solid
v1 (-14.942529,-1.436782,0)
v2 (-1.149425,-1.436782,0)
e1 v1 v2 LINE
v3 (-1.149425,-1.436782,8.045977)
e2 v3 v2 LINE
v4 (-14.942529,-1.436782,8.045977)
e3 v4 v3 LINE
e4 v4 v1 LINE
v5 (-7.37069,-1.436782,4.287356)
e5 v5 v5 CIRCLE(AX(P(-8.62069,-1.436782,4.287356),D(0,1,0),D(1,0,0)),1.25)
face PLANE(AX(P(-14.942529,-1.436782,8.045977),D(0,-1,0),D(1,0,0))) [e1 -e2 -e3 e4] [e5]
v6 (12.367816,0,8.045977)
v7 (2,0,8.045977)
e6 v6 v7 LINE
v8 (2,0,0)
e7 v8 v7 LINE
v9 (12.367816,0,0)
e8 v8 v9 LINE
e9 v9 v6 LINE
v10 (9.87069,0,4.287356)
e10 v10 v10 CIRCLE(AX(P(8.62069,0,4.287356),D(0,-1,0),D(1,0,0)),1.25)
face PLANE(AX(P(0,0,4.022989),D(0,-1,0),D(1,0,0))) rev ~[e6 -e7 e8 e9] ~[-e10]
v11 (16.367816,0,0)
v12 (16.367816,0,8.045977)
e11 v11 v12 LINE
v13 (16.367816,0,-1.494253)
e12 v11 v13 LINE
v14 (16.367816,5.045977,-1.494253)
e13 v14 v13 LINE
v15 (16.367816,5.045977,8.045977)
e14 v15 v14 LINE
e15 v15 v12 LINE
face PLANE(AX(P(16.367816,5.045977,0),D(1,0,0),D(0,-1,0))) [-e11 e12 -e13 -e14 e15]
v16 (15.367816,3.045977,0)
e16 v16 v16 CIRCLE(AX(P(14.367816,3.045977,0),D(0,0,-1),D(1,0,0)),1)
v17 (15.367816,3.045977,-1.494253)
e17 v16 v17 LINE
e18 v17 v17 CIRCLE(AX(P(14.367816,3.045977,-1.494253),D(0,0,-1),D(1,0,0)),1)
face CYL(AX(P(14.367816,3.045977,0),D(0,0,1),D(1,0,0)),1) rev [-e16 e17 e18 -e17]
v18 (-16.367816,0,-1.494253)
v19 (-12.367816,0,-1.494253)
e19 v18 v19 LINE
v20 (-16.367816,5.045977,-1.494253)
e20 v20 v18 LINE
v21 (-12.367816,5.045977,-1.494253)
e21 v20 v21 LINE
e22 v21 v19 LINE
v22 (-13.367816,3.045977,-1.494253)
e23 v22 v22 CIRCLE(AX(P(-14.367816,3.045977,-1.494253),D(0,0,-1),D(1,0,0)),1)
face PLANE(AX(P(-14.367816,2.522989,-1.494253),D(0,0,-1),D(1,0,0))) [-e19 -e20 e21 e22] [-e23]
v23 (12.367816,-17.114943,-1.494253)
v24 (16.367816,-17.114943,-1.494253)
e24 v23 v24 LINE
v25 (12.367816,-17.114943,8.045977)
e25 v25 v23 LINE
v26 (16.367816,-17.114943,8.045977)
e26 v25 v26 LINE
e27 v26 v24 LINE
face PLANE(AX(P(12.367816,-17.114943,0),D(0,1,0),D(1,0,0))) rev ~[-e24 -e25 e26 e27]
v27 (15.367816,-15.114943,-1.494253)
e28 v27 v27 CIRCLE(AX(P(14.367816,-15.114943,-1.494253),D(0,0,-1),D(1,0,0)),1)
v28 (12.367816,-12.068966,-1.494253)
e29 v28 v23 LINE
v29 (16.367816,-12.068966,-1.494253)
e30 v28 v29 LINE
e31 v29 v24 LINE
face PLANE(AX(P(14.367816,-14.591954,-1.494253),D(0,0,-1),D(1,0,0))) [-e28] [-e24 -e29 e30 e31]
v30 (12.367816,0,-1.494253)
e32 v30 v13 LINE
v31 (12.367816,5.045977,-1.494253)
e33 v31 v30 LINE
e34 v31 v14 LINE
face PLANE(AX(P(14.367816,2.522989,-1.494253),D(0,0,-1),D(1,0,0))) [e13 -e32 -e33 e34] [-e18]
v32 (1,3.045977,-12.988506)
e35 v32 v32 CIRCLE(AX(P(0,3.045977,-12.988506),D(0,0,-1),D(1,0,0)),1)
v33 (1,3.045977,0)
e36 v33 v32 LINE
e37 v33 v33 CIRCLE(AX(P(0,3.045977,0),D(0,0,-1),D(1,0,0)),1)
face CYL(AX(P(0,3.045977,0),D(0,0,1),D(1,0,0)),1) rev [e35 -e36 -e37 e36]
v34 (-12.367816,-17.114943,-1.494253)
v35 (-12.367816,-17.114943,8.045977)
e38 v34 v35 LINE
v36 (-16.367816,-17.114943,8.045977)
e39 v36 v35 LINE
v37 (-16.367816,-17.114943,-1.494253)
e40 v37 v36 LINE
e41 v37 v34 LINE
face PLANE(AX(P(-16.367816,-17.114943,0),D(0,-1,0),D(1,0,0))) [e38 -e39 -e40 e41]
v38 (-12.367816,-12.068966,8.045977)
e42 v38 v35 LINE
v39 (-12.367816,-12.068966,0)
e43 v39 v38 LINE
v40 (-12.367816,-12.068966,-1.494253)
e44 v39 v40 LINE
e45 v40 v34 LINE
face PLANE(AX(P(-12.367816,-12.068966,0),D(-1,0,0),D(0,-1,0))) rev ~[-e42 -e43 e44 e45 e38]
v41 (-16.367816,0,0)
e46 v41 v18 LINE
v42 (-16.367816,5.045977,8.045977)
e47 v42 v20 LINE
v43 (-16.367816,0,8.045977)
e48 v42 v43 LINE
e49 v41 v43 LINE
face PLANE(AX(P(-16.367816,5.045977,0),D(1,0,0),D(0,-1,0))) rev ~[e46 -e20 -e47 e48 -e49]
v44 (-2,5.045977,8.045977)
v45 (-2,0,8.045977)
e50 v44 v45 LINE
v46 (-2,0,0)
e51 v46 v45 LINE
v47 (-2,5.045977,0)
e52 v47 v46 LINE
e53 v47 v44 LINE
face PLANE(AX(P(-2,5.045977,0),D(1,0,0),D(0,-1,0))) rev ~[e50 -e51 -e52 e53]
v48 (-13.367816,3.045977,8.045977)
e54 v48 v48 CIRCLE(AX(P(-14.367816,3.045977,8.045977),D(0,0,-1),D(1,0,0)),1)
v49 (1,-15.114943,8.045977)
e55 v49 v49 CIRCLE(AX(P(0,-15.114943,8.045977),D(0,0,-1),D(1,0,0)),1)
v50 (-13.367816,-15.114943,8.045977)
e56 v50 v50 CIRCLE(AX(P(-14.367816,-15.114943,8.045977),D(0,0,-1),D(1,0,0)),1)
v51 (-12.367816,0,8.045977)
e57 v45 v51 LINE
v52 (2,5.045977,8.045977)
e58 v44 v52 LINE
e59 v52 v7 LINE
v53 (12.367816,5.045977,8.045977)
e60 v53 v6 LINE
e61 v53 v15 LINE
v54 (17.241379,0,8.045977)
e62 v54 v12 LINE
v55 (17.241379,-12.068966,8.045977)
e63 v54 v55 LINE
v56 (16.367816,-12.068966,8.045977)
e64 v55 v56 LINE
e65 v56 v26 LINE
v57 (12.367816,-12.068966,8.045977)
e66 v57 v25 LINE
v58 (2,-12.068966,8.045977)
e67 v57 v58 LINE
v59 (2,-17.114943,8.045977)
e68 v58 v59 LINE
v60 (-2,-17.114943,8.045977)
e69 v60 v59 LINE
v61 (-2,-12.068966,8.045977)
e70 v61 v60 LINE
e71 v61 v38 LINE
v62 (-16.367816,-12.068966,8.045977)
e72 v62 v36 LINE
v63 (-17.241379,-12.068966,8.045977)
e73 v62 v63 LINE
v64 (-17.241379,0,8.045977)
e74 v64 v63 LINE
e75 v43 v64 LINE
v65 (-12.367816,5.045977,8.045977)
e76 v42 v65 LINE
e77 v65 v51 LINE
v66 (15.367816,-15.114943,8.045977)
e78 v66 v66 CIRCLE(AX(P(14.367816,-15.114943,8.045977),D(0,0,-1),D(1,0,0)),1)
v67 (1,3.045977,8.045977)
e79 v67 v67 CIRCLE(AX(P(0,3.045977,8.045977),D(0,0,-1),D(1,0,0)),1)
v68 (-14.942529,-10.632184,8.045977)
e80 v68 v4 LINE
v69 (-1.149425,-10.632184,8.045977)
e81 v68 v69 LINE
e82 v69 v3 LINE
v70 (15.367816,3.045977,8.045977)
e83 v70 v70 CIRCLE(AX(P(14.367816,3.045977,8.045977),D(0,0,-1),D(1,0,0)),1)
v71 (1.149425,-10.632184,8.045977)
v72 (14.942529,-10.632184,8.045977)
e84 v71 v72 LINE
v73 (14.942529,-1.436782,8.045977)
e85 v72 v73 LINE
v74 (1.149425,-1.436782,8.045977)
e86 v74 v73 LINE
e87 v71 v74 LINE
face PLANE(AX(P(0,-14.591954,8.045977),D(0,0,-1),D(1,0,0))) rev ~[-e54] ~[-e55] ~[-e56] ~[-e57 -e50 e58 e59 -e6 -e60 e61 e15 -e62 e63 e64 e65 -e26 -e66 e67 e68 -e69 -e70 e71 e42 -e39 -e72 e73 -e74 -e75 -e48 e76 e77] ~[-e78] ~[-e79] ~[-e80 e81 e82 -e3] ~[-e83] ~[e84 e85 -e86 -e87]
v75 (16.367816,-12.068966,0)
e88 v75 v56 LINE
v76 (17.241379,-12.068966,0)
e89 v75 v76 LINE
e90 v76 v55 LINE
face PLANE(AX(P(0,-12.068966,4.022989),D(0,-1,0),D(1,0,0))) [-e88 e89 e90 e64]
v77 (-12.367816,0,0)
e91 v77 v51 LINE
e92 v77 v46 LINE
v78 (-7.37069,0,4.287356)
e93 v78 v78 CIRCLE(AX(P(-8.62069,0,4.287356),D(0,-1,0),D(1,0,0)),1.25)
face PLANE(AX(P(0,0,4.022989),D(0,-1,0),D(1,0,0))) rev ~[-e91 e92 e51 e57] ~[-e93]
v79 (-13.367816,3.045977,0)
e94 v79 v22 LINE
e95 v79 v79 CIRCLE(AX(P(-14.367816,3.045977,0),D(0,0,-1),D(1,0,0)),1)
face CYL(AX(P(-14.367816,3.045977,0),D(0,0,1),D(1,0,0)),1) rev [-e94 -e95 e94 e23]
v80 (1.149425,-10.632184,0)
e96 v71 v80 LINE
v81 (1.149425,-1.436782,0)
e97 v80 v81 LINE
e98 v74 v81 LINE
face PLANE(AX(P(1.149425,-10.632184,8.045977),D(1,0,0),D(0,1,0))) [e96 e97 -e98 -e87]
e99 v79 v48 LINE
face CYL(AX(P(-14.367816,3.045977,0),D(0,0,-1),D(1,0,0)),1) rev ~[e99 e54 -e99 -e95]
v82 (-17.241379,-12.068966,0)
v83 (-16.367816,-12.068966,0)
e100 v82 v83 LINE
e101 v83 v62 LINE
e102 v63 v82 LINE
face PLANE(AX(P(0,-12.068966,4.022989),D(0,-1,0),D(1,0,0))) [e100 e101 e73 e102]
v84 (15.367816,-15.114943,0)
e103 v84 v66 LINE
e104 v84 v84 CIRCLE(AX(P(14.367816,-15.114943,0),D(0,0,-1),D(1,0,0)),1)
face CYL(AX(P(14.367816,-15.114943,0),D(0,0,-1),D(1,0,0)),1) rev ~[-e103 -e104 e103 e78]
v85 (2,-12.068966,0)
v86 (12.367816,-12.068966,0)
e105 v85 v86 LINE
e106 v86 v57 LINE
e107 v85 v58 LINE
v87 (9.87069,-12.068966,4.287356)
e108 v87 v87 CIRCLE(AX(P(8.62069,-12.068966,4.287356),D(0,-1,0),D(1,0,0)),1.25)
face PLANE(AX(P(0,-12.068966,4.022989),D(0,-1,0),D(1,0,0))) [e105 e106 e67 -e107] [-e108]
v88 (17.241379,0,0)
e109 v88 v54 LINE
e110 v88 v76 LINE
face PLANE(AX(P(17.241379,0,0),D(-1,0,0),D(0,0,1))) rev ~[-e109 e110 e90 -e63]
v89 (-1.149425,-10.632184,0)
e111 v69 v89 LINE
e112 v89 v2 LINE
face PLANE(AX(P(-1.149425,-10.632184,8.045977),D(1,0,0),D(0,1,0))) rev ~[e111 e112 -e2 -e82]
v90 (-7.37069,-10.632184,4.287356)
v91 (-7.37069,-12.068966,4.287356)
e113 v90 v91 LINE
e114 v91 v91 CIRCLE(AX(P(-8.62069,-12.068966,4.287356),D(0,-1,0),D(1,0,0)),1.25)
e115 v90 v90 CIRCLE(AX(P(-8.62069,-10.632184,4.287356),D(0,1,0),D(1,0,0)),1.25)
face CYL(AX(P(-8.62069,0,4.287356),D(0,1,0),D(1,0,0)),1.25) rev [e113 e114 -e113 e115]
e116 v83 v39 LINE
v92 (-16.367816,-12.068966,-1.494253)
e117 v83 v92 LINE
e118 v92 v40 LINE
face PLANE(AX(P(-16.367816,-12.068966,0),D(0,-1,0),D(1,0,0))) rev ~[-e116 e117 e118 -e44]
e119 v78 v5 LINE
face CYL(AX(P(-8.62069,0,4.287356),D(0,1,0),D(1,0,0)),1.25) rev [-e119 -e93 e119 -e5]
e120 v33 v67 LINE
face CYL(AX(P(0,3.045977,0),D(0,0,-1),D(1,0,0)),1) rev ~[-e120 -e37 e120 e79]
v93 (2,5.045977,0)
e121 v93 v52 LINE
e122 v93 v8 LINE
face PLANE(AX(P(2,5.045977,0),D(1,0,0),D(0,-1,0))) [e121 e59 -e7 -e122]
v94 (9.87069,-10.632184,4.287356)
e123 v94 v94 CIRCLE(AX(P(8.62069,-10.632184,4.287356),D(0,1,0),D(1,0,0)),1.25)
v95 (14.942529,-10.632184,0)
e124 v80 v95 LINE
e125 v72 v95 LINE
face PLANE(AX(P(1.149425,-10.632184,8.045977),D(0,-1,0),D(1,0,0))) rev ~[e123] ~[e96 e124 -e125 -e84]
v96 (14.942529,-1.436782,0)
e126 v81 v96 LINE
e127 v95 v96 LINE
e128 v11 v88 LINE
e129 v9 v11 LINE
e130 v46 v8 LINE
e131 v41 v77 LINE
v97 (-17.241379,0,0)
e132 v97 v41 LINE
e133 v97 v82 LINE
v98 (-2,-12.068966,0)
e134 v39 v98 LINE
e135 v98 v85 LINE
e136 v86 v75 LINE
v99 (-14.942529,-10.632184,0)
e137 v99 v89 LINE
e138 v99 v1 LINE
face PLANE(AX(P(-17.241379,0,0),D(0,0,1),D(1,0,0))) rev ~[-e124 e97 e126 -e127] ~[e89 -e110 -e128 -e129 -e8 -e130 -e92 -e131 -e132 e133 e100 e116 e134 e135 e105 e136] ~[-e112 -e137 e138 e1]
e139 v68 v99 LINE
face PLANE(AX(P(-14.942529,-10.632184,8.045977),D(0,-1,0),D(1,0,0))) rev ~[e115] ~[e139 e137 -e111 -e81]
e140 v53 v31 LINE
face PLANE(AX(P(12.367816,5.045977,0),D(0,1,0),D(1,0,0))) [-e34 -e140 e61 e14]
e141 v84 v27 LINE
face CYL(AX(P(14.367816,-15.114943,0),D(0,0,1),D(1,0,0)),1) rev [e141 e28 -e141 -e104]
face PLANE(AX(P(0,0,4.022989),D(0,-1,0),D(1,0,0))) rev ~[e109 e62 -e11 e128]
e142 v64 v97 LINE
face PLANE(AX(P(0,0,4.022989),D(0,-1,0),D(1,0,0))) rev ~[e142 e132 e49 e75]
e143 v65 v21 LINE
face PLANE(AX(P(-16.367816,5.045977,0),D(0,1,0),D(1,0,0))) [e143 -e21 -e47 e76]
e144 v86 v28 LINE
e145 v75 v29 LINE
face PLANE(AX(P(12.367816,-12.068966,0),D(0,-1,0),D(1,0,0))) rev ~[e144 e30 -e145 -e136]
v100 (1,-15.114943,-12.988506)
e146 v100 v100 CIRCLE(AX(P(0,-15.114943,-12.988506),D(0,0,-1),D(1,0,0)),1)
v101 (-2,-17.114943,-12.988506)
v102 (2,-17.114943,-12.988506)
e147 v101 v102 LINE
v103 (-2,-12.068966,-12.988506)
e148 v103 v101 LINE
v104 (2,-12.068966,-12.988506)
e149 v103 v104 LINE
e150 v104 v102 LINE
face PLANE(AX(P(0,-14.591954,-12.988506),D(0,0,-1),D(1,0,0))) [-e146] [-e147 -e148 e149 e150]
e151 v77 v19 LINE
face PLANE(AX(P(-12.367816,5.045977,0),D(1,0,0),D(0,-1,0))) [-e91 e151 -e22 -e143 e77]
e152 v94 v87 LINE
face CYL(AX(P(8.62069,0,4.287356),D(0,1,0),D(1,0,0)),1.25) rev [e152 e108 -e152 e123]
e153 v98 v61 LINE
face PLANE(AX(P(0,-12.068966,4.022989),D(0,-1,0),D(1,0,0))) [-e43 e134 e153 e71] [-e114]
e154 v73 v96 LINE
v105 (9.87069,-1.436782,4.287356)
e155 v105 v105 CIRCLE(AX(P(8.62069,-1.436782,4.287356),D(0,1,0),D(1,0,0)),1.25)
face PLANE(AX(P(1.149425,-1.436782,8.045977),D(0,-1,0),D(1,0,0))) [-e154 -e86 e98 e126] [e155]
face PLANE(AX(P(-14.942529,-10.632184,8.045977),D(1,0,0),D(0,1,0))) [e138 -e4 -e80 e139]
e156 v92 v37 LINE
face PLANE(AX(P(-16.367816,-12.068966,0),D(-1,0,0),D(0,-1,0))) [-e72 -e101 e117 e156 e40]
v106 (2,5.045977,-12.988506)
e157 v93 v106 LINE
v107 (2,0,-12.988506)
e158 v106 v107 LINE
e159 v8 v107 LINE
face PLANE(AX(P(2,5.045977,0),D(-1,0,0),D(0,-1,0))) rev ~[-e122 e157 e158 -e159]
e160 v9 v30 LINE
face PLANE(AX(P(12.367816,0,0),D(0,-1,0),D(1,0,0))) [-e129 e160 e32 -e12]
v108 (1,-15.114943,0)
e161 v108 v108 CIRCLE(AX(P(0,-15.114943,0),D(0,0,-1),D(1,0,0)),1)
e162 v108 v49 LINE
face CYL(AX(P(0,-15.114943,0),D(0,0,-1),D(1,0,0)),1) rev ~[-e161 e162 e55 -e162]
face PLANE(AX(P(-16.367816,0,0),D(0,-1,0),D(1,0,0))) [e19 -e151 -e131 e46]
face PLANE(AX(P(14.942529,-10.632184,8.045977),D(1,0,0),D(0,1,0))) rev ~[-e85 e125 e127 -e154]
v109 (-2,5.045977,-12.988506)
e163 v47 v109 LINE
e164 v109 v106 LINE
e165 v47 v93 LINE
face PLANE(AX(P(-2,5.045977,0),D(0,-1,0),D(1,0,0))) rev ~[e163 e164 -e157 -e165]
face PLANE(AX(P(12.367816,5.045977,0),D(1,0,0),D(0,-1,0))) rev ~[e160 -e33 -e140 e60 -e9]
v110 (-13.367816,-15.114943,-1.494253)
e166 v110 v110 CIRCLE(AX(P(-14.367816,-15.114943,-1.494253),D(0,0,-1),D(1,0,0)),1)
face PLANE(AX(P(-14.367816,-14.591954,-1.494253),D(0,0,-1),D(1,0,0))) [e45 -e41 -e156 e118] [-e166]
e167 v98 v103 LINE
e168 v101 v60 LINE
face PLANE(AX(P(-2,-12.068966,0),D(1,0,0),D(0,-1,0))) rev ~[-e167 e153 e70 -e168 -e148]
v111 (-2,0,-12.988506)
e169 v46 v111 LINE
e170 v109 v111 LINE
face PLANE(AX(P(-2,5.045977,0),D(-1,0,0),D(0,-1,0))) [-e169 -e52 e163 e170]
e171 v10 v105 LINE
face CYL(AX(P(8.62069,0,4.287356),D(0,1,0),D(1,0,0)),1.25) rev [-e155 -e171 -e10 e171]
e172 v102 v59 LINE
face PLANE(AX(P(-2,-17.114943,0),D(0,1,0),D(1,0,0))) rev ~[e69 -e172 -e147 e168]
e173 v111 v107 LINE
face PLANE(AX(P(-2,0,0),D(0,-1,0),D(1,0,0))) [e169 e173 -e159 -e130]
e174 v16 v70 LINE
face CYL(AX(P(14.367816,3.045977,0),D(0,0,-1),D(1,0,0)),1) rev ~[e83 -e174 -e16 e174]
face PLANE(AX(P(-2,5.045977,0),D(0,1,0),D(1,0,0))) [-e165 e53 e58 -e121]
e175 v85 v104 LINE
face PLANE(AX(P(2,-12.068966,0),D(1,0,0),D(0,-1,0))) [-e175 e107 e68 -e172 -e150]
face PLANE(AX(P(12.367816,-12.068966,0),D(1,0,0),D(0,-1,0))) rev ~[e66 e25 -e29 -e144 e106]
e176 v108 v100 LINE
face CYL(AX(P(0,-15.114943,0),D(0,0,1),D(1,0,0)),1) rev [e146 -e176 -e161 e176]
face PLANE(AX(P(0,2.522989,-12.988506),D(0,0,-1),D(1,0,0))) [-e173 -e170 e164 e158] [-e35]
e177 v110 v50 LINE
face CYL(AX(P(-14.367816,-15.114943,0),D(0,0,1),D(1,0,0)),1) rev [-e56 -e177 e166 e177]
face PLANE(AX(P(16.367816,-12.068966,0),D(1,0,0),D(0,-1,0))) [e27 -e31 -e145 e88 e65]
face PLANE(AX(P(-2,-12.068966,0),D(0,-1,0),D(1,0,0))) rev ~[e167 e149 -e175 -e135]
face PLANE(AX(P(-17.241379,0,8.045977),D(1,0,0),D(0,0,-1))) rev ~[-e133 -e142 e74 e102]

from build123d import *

# Parameters (mm, degrees)
F1_R          = 1.25
F2_DEPTH      = 12.0689655172
F3_W          = 13.7931034483
F3_H          = 9.1954022989
F4_DEPTH      = 8.0469770115
F5_W          = 4
F5_H          = 5.0459770115
F5_R          = 1
F6_DEPTH      = 8.0459770115
F6_DEPTH_BACK = 1.4942528736
F7_W          = 4
F7_H          = 5.0459770115
F7_R          = 1
F8_DEPTH      = 12.9885057471
F8_DEPTH_BACK = 8.0459770115


with BuildPart() as f2:
    # F1 (on Front) → F2 (new body)
    with BuildSketch(Plane.XZ):
        Polygon((-17.2413793103, 0), (0, 0), (17.2413793103, 0), (17.2413793103, 1.724137931), (17.2413793103, 8.0459770115), (0, 8.0459770115), (-17.2413793103, 8.0459770115), (-17.2413793103, 1.724137931), align=None)
        with Locations((-8.6206896552, 4.2873563218)):
            Circle(F1_R, mode=Mode.SUBTRACT)
        with Locations((8.6206896552, 4.2873563218)):
            Circle(F1_R, mode=Mode.SUBTRACT)
    extrude(amount=F2_DEPTH)

    # F3 (on face) → F4 (cut, through all)
    with BuildSketch(Plane.XY.offset(8.0459770115)):
        with Locations((-8.0459770115, -6.0344827586)):
            Rectangle(F3_W, F3_H)
        with Locations((8.0459770115, -6.0344827586)):
            Rectangle(F3_W, F3_H)
    extrude(amount=-F4_DEPTH, mode=Mode.SUBTRACT)

    # F5 (on face) → F6 (join, two sides)
    with BuildSketch(Plane(origin=(0, 0, 0), x_dir=(1, 0, 0), z_dir=(0, 0, -1))) as f6_sk:
        with Locations((-14.367816092, 14.591954023)):
            Rectangle(F5_W, F5_H)
        with Locations((-14.367816092, 15.1149425287)):
            Circle(F5_R, mode=Mode.SUBTRACT)
        with Locations((14.367816092, 14.591954023)):
            Rectangle(F5_W, F5_H)
        with Locations((14.367816092, 15.1149425287)):
            Circle(F5_R, mode=Mode.SUBTRACT)
        with Locations((-14.367816092, -2.5229885057)):
            Rectangle(F5_W, F5_H)
        with Locations((-14.367816092, -3.0459770115)):
            Circle(F5_R, mode=Mode.SUBTRACT)
        with Locations((14.367816092, -2.5229885057)):
            Rectangle(F5_W, F5_H)
        with Locations((14.367816092, -3.0459770115)):
            Circle(F5_R, mode=Mode.SUBTRACT)
    extrude(amount=-F6_DEPTH)
    extrude(f6_sk.sketch, amount=F6_DEPTH_BACK)

    # F7 (on face) → F8 (join, two sides)
    with BuildSketch(Plane(origin=(0, 0, 0), x_dir=(1, 0, 0), z_dir=(0, 0, -1))) as f8_sk:
        with Locations((0, 14.591954023)):
            Rectangle(F7_W, F7_H)
        with Locations((0, 15.1149425287)):
            Circle(F7_R, mode=Mode.SUBTRACT)
        with Locations((0, -2.5229885057)):
            Rectangle(F7_W, F7_H)
        with Locations((0, -3.0459770115)):
            Circle(F7_R, mode=Mode.SUBTRACT)
    extrude(amount=F8_DEPTH)
    extrude(f8_sk.sketch, amount=-F8_DEPTH_BACK)


solid = f2.part
